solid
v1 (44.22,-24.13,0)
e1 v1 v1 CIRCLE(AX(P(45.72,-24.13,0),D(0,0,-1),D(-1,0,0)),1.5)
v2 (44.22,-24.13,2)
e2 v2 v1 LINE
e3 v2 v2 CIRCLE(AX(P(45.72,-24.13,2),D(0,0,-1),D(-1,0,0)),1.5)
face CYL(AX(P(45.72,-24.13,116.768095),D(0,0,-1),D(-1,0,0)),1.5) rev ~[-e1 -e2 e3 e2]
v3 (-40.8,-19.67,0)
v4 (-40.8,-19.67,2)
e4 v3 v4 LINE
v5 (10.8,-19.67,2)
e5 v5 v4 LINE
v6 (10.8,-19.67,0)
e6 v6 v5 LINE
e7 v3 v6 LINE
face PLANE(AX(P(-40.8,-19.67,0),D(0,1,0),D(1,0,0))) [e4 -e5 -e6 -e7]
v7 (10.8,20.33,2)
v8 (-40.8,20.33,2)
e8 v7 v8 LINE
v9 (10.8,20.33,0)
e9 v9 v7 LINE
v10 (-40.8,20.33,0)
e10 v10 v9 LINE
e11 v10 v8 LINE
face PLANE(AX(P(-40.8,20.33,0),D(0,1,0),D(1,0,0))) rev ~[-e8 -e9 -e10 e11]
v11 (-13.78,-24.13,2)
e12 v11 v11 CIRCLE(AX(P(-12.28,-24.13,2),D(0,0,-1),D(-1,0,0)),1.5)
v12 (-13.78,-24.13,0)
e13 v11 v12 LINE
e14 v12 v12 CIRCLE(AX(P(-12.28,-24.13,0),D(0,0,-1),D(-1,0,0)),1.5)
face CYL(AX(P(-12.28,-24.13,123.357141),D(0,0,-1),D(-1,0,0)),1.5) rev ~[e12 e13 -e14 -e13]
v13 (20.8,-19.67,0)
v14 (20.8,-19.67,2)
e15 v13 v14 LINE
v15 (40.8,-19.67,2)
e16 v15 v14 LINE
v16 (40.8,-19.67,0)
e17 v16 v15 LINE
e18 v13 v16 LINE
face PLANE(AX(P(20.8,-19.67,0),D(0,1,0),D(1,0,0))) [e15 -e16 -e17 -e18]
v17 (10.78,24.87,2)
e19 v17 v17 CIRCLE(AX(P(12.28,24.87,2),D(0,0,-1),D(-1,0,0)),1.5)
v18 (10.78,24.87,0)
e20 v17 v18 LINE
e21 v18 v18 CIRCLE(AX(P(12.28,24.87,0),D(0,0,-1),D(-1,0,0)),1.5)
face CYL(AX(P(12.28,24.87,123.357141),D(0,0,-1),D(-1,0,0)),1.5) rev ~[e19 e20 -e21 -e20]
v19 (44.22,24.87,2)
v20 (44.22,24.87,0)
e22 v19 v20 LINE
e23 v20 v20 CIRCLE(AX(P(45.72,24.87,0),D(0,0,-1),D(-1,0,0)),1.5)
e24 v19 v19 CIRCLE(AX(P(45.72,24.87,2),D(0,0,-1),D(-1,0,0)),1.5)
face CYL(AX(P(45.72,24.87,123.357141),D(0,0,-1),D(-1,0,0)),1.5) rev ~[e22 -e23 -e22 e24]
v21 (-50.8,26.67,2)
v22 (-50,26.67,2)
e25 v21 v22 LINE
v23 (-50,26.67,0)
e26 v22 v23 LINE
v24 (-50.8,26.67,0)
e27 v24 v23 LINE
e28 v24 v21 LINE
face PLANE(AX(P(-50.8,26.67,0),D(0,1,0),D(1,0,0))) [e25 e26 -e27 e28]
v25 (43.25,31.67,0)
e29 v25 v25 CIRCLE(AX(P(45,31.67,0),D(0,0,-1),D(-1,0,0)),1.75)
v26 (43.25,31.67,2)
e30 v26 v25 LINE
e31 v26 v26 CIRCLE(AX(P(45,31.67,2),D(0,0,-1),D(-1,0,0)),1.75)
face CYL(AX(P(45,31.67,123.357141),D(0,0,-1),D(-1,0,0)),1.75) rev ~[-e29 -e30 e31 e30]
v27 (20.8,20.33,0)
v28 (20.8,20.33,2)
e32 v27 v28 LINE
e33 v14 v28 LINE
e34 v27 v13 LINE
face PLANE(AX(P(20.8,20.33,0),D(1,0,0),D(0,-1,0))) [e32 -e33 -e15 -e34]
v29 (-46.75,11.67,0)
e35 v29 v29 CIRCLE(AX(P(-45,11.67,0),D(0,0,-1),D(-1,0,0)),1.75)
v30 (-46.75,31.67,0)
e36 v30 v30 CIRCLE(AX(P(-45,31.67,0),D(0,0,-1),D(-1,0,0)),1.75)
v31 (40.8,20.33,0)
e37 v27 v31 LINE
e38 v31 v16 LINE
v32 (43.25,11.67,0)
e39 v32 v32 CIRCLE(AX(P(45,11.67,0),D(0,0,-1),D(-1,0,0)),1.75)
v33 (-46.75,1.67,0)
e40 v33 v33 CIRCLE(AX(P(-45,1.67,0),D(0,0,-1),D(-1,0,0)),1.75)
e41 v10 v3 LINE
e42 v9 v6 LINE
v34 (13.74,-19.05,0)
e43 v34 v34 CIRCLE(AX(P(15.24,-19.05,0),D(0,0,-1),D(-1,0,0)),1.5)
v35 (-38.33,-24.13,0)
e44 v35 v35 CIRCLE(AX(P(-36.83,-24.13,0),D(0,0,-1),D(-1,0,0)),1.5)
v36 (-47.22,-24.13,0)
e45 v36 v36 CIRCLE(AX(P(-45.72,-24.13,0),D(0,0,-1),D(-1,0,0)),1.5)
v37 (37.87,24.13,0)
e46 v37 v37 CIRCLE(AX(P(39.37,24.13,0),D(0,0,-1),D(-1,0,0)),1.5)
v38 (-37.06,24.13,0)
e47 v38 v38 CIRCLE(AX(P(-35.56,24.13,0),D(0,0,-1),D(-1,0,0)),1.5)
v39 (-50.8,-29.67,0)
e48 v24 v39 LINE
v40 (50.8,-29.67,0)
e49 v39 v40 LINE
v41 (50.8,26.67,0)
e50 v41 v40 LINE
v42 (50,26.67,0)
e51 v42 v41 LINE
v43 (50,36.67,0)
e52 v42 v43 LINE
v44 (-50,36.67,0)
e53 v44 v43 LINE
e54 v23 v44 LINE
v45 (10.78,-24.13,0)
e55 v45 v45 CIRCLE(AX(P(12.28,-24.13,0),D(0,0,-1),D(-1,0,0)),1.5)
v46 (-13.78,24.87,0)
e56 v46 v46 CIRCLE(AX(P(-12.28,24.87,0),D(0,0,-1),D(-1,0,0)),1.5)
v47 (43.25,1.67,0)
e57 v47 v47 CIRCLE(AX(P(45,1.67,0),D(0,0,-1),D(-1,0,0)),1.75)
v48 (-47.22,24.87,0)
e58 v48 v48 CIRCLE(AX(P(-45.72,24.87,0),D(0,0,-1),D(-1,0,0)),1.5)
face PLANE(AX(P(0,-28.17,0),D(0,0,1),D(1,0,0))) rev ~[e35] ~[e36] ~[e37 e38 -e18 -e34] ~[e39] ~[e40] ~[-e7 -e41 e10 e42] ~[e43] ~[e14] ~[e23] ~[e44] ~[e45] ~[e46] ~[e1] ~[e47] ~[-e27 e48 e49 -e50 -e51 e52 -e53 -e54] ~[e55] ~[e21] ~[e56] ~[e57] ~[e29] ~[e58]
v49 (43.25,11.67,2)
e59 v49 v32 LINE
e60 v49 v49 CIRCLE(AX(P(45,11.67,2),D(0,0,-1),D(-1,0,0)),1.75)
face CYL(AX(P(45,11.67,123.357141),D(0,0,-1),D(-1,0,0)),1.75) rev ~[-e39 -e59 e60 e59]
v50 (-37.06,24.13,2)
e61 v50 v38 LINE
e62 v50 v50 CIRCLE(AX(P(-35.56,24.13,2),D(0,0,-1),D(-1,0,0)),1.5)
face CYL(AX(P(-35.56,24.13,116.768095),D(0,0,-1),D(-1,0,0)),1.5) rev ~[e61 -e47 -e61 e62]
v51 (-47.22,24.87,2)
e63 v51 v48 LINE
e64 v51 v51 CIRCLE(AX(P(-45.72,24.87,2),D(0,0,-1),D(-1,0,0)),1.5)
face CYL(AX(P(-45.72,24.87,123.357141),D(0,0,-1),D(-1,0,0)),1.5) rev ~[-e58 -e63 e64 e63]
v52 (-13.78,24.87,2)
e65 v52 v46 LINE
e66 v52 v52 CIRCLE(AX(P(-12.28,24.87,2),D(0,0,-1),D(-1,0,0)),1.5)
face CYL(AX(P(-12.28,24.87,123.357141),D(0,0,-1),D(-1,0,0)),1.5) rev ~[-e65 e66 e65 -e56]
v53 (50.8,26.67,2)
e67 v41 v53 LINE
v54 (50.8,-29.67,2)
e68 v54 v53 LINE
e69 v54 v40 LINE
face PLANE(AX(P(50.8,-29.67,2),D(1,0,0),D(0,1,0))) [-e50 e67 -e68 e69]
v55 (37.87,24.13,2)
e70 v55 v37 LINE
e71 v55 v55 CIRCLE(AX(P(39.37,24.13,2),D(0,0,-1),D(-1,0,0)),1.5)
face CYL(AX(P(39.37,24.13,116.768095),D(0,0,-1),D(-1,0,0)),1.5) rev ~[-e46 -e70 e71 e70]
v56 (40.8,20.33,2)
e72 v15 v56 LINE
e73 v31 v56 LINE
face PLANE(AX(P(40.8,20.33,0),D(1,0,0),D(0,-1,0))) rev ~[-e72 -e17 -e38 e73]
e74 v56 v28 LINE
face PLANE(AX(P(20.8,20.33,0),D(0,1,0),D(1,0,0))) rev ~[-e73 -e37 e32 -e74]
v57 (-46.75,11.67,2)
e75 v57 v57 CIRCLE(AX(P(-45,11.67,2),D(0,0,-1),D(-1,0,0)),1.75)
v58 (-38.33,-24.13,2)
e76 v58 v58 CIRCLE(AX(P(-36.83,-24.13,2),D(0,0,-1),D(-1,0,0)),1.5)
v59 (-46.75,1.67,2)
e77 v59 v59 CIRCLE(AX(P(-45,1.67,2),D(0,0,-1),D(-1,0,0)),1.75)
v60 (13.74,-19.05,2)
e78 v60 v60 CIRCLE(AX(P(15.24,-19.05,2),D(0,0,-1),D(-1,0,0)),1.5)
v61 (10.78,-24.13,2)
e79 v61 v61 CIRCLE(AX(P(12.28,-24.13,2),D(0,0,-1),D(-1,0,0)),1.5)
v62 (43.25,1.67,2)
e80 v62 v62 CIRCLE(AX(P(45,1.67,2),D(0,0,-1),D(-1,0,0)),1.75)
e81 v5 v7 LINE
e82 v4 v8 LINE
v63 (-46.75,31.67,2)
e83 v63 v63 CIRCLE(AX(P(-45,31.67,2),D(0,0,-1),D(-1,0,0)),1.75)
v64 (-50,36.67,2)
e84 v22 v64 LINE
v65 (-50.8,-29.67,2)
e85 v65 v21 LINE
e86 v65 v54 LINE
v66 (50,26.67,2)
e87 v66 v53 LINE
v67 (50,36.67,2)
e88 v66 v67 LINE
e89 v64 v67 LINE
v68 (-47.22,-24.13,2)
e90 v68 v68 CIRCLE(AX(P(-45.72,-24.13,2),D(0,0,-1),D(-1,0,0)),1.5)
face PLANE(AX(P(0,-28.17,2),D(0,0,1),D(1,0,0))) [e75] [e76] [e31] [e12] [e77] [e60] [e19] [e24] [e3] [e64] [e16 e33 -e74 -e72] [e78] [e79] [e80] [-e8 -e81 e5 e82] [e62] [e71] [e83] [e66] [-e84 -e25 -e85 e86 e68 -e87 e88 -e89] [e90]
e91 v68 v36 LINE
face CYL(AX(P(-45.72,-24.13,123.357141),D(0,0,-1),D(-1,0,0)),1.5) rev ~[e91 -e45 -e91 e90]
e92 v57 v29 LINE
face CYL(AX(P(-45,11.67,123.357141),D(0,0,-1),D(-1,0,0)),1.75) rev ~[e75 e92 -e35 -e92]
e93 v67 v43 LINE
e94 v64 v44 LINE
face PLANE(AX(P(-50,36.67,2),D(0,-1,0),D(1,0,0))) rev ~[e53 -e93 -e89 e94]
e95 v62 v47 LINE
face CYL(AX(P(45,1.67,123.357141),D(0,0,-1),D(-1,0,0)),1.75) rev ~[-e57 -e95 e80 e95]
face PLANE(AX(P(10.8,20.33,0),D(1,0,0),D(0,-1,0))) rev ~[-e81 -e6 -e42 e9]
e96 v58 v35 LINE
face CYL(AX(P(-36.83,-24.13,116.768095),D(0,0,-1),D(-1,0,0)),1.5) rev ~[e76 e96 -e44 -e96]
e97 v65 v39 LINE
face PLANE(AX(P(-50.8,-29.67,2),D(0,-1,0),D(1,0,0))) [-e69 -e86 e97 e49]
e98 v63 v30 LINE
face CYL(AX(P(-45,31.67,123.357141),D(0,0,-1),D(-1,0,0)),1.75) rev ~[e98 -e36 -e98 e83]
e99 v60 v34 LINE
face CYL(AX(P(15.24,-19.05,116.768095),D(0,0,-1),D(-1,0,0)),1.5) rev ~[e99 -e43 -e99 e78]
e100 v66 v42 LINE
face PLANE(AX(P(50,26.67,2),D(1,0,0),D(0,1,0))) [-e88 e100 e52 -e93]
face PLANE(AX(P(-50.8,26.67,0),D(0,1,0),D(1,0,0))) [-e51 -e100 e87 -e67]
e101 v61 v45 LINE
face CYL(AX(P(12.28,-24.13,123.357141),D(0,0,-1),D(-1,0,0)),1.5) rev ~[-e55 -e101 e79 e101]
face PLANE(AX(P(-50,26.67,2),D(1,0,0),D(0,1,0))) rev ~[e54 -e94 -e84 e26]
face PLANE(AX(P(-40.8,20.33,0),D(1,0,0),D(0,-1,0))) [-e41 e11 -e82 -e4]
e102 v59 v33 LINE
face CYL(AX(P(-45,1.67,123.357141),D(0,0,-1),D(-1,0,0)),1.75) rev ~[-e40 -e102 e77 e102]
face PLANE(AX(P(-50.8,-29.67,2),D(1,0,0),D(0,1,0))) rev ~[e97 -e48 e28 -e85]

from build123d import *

# Parameters (mm, degrees)
F0_W      = 101.6
F0_H      = 53.34
F1_DEPTH  = 2
F3_D      = 3
F4_W      = 101.6
F4_H      = 3
F4_W_2    = 100
F4_H_2    = 10
F5_DEPTH  = 2
F7_D      = 3.5
F9_D      = 3
F10_W     = 51.6
F10_H     = 40
F10_W_2   = 20
F11_DEPTH = 2.001


with BuildPart() as f1:
    # F0 (on Top) → F1 (new body)
    with BuildSketch(Plane.XY):
        Rectangle(F0_W, F0_H)
    extrude(amount=F1_DEPTH)

    # F3 (through all)
    with Locations(Plane.XY.offset(2)):
        with Locations((-35.56, 24.13), (39.37, 24.13), (45.72, -24.13), (15.24, -19.05), (-36.83, -24.13)):
            Hole(F3_D / 2)

    # F4 (on face) → F5 (join, through all)
    with BuildSketch(Plane.XY.offset(2)):
        with Locations((0, -28.17)):
            Rectangle(F4_W, F4_H)
        with Locations((0, 31.67)):
            Rectangle(F4_W_2, F4_H_2)
    extrude(amount=-F5_DEPTH)

    # F7 (through all)
    with Locations(Plane.XY.offset(2)):
        with Locations((-45, 31.67), (45, 31.67), (-45, 11.67), (-45, 1.67), (45, 11.67), (45, 1.67)):
            Hole(F7_D / 2)

    # F9 (through all)
    with Locations(Plane.XY.offset(2)):
        with Locations((-45.72, -24.13), (-45.72, 24.87), (-12.28, 24.87), (12.28, 24.87), (12.28, -24.13), (-12.28, -24.13), (45.72, 24.87)):
            Hole(F9_D / 2)

    # F10 (on face) → F11 (cut, through all)
    with BuildSketch(Plane(origin=(0, 0, 0), x_dir=(1, 0, 0), z_dir=(0, 0, -1))):
        with Locations((-15, -0.33)):
            Rectangle(F10_W, F10_H)
        with Locations((30.8, -0.33)):
            Rectangle(F10_W_2, F10_H)
    extrude(amount=-F11_DEPTH, mode=Mode.SUBTRACT)


solid = f1.part
